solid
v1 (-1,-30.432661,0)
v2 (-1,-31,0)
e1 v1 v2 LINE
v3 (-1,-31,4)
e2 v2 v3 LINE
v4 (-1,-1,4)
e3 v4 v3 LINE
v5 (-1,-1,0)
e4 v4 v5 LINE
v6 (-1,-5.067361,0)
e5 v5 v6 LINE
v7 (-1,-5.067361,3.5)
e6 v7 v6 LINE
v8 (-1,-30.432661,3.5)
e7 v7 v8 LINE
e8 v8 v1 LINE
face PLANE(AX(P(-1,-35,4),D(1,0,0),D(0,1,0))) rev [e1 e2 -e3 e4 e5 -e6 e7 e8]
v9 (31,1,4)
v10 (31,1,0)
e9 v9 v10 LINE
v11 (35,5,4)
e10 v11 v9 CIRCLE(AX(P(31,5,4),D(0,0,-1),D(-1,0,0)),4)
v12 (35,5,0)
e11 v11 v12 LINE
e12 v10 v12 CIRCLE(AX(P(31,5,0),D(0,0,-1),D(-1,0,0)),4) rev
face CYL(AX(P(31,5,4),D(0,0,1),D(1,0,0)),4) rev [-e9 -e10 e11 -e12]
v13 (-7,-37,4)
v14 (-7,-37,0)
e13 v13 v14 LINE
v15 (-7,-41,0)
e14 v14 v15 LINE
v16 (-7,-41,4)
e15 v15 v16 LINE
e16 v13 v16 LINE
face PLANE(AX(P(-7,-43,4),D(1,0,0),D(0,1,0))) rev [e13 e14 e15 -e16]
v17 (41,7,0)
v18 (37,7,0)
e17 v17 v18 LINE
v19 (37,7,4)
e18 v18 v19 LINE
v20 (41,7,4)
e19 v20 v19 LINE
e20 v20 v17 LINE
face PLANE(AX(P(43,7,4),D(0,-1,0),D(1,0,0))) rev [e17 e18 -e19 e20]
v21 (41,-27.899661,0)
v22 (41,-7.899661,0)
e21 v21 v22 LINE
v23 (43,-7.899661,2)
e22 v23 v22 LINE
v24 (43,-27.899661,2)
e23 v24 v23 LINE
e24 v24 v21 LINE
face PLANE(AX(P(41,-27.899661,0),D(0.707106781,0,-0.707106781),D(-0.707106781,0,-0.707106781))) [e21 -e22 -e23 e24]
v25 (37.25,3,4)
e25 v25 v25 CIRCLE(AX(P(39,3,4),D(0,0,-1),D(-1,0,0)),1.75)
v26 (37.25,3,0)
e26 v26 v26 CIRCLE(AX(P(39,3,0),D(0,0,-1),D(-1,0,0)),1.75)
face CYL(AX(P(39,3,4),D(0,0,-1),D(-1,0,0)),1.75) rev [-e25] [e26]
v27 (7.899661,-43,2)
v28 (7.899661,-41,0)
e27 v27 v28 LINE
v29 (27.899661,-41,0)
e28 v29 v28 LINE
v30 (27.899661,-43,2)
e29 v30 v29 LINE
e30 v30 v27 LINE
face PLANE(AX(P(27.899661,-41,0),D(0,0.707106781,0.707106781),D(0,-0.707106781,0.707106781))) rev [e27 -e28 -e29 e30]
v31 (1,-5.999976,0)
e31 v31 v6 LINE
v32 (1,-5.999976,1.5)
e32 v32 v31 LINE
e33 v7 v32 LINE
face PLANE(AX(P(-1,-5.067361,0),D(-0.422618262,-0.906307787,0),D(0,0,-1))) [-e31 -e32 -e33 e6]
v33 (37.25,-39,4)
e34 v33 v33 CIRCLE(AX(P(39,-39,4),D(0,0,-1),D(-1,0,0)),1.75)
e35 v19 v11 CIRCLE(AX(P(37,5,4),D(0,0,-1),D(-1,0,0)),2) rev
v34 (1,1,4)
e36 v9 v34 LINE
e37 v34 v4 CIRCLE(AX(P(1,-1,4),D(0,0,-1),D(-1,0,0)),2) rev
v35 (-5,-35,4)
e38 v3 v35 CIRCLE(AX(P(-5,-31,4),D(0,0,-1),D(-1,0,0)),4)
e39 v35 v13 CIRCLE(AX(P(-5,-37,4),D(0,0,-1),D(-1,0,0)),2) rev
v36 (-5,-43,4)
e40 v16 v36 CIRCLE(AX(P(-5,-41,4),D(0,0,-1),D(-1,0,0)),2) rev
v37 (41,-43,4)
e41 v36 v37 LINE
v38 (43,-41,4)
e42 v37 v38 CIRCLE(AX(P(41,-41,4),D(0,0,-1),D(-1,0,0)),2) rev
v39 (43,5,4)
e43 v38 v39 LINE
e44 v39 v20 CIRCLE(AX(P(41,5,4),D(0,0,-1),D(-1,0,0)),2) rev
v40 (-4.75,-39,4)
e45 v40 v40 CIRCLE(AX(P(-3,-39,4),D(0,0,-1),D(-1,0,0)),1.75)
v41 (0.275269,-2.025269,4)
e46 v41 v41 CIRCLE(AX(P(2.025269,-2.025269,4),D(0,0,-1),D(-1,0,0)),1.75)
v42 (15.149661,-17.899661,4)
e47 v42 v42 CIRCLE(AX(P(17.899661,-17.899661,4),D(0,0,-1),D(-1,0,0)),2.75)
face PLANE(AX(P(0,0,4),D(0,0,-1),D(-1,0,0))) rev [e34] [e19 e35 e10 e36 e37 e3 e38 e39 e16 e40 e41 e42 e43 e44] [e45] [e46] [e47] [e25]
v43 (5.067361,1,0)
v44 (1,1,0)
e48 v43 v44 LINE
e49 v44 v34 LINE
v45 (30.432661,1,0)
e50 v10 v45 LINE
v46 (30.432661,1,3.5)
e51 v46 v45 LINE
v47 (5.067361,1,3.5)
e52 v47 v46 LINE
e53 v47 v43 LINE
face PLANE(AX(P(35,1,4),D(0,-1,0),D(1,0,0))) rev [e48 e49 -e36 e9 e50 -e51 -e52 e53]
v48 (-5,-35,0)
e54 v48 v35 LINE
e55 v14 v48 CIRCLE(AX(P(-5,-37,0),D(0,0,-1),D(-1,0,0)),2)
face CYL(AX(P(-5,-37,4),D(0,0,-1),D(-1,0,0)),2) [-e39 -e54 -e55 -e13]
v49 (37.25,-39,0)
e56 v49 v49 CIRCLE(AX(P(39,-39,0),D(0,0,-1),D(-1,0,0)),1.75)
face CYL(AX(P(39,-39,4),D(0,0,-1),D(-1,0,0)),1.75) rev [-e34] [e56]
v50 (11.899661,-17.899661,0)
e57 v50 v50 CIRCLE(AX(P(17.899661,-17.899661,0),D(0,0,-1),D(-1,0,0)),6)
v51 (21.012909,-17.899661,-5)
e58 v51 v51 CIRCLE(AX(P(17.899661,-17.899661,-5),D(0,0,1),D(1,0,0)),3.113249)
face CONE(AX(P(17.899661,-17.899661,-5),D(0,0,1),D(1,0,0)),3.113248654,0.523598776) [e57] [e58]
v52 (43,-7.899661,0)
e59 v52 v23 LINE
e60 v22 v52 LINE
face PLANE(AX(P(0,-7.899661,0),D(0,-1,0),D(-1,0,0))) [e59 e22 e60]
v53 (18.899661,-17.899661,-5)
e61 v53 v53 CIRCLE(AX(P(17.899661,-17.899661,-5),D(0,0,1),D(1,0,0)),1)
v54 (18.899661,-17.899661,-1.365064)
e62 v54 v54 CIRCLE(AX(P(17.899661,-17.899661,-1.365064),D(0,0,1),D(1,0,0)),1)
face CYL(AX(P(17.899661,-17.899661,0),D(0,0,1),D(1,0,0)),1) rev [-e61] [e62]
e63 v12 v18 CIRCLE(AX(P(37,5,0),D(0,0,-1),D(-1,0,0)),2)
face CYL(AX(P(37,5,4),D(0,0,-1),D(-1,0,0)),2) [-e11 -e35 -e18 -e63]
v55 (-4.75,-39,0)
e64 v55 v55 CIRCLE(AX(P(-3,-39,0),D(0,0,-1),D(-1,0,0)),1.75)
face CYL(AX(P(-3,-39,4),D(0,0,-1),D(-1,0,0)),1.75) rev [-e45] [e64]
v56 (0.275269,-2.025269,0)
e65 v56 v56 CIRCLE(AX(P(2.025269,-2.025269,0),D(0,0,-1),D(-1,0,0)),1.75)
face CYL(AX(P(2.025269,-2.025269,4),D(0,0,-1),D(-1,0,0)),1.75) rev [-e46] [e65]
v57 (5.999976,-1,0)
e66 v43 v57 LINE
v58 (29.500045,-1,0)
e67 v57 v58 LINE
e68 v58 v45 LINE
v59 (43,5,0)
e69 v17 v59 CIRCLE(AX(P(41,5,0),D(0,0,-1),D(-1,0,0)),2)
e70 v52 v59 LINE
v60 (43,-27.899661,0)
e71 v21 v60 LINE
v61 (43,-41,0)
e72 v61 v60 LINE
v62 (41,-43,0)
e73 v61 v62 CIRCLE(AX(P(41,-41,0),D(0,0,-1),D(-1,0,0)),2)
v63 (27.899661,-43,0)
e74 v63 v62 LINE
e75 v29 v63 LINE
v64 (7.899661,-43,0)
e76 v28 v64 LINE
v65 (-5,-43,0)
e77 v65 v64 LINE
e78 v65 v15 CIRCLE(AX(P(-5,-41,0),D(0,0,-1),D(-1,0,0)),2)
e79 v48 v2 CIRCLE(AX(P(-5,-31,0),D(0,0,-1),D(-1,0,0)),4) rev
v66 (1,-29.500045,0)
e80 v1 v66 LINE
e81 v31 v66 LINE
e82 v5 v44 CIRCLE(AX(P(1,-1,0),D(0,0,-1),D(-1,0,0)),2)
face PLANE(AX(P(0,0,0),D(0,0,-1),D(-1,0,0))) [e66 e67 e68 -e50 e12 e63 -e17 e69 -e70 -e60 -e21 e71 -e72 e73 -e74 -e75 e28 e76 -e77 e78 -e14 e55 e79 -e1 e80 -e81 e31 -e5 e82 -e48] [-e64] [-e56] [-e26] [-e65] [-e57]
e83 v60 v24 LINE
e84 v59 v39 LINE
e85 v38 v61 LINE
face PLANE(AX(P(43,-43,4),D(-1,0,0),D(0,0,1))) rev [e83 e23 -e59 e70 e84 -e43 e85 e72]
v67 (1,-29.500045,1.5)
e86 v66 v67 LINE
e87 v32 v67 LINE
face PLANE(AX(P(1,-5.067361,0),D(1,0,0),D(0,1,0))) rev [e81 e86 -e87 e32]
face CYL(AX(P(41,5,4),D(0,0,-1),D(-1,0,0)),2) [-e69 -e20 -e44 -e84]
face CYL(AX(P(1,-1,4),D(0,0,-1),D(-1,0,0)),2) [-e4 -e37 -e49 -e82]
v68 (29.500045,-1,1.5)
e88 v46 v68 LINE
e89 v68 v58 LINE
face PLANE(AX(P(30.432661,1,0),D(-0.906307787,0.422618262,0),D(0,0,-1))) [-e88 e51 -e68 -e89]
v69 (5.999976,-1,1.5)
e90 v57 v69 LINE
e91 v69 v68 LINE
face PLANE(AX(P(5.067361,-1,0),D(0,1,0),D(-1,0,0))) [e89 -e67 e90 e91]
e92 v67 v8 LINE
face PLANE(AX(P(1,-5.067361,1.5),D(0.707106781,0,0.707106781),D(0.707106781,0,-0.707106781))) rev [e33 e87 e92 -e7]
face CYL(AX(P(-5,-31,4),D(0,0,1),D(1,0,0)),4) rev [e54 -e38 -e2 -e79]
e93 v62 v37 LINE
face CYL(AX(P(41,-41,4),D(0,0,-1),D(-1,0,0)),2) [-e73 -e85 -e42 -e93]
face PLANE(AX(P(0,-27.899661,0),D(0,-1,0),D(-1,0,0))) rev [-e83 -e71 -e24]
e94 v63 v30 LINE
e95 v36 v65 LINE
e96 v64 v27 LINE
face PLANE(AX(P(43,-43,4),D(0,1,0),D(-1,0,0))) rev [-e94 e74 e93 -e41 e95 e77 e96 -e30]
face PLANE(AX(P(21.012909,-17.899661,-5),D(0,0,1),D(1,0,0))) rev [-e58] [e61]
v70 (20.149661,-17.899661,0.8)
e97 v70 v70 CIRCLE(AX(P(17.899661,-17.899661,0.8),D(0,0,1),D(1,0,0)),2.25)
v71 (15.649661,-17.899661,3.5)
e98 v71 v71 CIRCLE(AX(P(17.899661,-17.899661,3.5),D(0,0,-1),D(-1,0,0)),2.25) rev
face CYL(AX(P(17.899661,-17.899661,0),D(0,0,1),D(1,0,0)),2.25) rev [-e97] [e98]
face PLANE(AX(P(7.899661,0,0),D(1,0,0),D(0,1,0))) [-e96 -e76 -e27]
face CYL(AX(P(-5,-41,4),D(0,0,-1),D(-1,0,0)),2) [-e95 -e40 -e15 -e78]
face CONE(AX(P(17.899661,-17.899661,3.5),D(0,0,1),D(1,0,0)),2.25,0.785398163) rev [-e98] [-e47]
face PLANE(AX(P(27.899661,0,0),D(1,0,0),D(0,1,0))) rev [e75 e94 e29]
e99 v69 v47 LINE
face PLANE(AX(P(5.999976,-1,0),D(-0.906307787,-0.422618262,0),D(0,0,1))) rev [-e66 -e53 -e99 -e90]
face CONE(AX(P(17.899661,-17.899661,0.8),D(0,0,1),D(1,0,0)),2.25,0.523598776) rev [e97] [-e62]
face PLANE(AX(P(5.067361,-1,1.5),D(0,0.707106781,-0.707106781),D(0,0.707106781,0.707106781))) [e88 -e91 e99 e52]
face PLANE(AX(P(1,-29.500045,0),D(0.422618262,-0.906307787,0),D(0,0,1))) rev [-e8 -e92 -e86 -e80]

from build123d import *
from OCP.BRepFilletAPI import BRepFilletAPI_MakeChamfer

# Parameters (mm, degrees)
BOSS_EXTRUDE1_DEPTH        = 4
FILLET1_R                  = 2
FILLET2_R                  = 4
SKETCH3_R                  = 6
CUT_EXTRUDE3_DEPTH         = 61.942595941
SKETCH4_R                  = 1.75
CUT_EXTRUDE6_DEPTH         = 61.942595941
CUT_EXTRUDE7_DEPTH         = 10
CUT_EXTRUDE8_START         = -12.533
CUT_EXTRUDE8_DEPTH         = 25.3653
CHAMFER1_SIZE              = 2
CHAMFER1_SIZE_2            = 0.932615316
CHAMFER1_OF_MIRROR1_SIZE   = 0.932615316
CHAMFER1_OF_MIRROR1_SIZE_2 = 2
CHAMFER2_SIZE              = 0.5


with BuildPart() as part:
    # Sketch1 → Boss-Extrude1 (new body)
    with BuildSketch(Plane.XY):
        Polygon((43, -43), (43, 7), (35, 7), (35, 1), (-1, 1), (-1, -35), (-7, -35), (-7, -43), align=None)
    extrude(amount=BOSS_EXTRUDE1_DEPTH)

    # Fillet1
    fillet1_edges = [part.edges().sort_by_distance(p)[0] for p in [
        (-7, -43, 2),
        (-7, -35, 2),
        (-1, 1, 2),
        (35, 7, 2),
        (43, 7, 2),
        (43, -43, 2),
    ]]
    fillet(fillet1_edges, radius=FILLET1_R)

    # Fillet2
    fillet2_edges = [part.edges().sort_by_distance(p)[0] for p in [
        (35, 1, 2),
        (-1, -35, 2),
    ]]
    fillet(fillet2_edges, radius=FILLET2_R - 0.0001)  # a hair under: the kernel refuses the full size

    # Sketch3 → Cut-Extrude3 (cut, through all)
    with BuildSketch(Plane(origin=(0, 0, 0), x_dir=(-1, 0, 0), z_dir=(0, 0, -1))):
        with Locations((-17.899660586, -17.899660586)):
            Circle(SKETCH3_R)
    extrude(amount=-CUT_EXTRUDE3_DEPTH, mode=Mode.SUBTRACT)

    # Sketch4 → Cut-Extrude6 (cut, through all)
    with BuildSketch(Plane(origin=(0, 0, 0), x_dir=(-1, 0, 0), z_dir=(0, 0, -1))):
        with Locations((-39, 3)):
            Circle(SKETCH4_R)
        with Locations((-39, -39)):
            Circle(SKETCH4_R)
        with Locations((3, -39)):
            Circle(SKETCH4_R)
        with Locations((-2.025269256, -2.025269256)):
            Circle(SKETCH4_R)
    extrude(amount=-CUT_EXTRUDE6_DEPTH, mode=Mode.SUBTRACT)

    # Sketch5 → Cut-Extrude7 (cut, symmetric)
    with BuildSketch(Plane.ZY.offset(-17.899660586)):
        Polygon((2, -43), (0, -43), (0, -41), align=None)
    cut_extrude7 = extrude(amount=CUT_EXTRUDE7_DEPTH, both=True, mode=Mode.SUBTRACT)

    # Sketch6 → Cut-Extrude8 (cut)
    with BuildSketch(Plane.ZY.offset(-17.899660586).offset(CUT_EXTRUDE8_START)):
        Polygon((0, 1), (0, -1), (1.5, -1), (3.5, 1), align=None)
    cut_extrude8 = extrude(amount=CUT_EXTRUDE8_DEPTH, mode=Mode.SUBTRACT)

    # Chamfer1
    chamfer1_edges_1 = [part.edges().sort_by_distance(p)[0] for p in [
        (5.067360586, -1, 0.75),
    ]]
    chamfer1_side_1 = [part.faces().sort_by_distance(p)[0] for p in [
        (5.067360586, -0.981347694, 0.75),
    ]]
    chamfer1_edges_2 = [part.edges().sort_by_distance(p)[0] for p in [
        (30.432660586, -1, 0.75),
    ]]
    chamfer1_side_2 = [part.faces().sort_by_distance(p)[0] for p in [
        (30.41400828, -1, 0.75),
    ]]
    chamfer1 = BRepFilletAPI_MakeChamfer(part.part.solid().wrapped)
    for e in chamfer1_edges_1:
        chamfer1.Add(CHAMFER1_SIZE - 0.0001, CHAMFER1_SIZE_2 - 0.0001, e.wrapped, chamfer1_side_1[0].wrapped)
    for e in chamfer1_edges_2:
        chamfer1.Add(CHAMFER1_SIZE_2 - 0.0001, CHAMFER1_SIZE - 0.0001, e.wrapped, chamfer1_side_2[0].wrapped)
    add(Compound.cast(chamfer1.Shape()), mode=Mode.REPLACE)  # a hair under: the kernel refuses the full size

    # Mirror1: Cut-Extrude7, Cut-Extrude8 across plane
    add(cut_extrude7.mirror(Plane(origin=(0, 0, 0), x_dir=(0, 0, 1), z_dir=(-0.7071067811865479, -0.7071067811865472, 0))), mode=Mode.SUBTRACT)
    add(cut_extrude8.mirror(Plane(origin=(0, 0, 0), x_dir=(0, 0, 1), z_dir=(-0.7071067811865479, -0.7071067811865472, 0))), mode=Mode.SUBTRACT)

    # Chamfer1 of Mirror1
    chamfer1_of_mirror1_edges_1 = [part.edges().sort_by_distance(p)[0] for p in [
        (1, -5.067360586, 0.75),
    ]]
    chamfer1_of_mirror1_side_1 = [part.faces().sort_by_distance(p)[0] for p in [
        (1, -5.086012893, 0.75),
    ]]
    chamfer1_of_mirror1_edges_2 = [part.edges().sort_by_distance(p)[0] for p in [
        (1, -30.432660586, 0.75),
    ]]
    chamfer1_of_mirror1_side_2 = [part.faces().sort_by_distance(p)[0] for p in [
        (0.981347694, -30.432660586, 0.75),
    ]]
    chamfer1_of_mirror1 = BRepFilletAPI_MakeChamfer(part.part.solid().wrapped)
    for e in chamfer1_of_mirror1_edges_1:
        chamfer1_of_mirror1.Add(CHAMFER1_OF_MIRROR1_SIZE - 0.0001, CHAMFER1_OF_MIRROR1_SIZE_2 - 0.0001, e.wrapped, chamfer1_of_mirror1_side_1[0].wrapped)
    for e in chamfer1_of_mirror1_edges_2:
        chamfer1_of_mirror1.Add(CHAMFER1_OF_MIRROR1_SIZE_2 - 0.0001, CHAMFER1_OF_MIRROR1_SIZE - 0.0001, e.wrapped, chamfer1_of_mirror1_side_2[0].wrapped)
    add(Compound.cast(chamfer1_of_mirror1.Shape()), mode=Mode.REPLACE)  # a hair under: the kernel refuses the full size

    # Sketch7 → Revolve1 (revolve)
    with BuildSketch(Plane(origin=(0, -17.899660586, 0), x_dir=(0, 0, -1), z_dir=(0, -1, 0))):
        Polygon((0, 23.899660586), (5, 21.01290924), (5, 18.899660586), (1.365063509, 18.899660586), (-0.8, 20.149660586), (-4, 20.149660586), (-4, 23.899660586), align=None)
    revolve(axis=Axis((17.899660586, -17.899660586, 0), (0, 0, -1)))

    # Chamfer2
    chamfer2_edges = [part.edges().sort_by_distance(p)[0] for p in [
        (15.649660586, -17.899660586, 4),
    ]]
    chamfer(chamfer2_edges, length=CHAMFER2_SIZE)


solid = part.part
